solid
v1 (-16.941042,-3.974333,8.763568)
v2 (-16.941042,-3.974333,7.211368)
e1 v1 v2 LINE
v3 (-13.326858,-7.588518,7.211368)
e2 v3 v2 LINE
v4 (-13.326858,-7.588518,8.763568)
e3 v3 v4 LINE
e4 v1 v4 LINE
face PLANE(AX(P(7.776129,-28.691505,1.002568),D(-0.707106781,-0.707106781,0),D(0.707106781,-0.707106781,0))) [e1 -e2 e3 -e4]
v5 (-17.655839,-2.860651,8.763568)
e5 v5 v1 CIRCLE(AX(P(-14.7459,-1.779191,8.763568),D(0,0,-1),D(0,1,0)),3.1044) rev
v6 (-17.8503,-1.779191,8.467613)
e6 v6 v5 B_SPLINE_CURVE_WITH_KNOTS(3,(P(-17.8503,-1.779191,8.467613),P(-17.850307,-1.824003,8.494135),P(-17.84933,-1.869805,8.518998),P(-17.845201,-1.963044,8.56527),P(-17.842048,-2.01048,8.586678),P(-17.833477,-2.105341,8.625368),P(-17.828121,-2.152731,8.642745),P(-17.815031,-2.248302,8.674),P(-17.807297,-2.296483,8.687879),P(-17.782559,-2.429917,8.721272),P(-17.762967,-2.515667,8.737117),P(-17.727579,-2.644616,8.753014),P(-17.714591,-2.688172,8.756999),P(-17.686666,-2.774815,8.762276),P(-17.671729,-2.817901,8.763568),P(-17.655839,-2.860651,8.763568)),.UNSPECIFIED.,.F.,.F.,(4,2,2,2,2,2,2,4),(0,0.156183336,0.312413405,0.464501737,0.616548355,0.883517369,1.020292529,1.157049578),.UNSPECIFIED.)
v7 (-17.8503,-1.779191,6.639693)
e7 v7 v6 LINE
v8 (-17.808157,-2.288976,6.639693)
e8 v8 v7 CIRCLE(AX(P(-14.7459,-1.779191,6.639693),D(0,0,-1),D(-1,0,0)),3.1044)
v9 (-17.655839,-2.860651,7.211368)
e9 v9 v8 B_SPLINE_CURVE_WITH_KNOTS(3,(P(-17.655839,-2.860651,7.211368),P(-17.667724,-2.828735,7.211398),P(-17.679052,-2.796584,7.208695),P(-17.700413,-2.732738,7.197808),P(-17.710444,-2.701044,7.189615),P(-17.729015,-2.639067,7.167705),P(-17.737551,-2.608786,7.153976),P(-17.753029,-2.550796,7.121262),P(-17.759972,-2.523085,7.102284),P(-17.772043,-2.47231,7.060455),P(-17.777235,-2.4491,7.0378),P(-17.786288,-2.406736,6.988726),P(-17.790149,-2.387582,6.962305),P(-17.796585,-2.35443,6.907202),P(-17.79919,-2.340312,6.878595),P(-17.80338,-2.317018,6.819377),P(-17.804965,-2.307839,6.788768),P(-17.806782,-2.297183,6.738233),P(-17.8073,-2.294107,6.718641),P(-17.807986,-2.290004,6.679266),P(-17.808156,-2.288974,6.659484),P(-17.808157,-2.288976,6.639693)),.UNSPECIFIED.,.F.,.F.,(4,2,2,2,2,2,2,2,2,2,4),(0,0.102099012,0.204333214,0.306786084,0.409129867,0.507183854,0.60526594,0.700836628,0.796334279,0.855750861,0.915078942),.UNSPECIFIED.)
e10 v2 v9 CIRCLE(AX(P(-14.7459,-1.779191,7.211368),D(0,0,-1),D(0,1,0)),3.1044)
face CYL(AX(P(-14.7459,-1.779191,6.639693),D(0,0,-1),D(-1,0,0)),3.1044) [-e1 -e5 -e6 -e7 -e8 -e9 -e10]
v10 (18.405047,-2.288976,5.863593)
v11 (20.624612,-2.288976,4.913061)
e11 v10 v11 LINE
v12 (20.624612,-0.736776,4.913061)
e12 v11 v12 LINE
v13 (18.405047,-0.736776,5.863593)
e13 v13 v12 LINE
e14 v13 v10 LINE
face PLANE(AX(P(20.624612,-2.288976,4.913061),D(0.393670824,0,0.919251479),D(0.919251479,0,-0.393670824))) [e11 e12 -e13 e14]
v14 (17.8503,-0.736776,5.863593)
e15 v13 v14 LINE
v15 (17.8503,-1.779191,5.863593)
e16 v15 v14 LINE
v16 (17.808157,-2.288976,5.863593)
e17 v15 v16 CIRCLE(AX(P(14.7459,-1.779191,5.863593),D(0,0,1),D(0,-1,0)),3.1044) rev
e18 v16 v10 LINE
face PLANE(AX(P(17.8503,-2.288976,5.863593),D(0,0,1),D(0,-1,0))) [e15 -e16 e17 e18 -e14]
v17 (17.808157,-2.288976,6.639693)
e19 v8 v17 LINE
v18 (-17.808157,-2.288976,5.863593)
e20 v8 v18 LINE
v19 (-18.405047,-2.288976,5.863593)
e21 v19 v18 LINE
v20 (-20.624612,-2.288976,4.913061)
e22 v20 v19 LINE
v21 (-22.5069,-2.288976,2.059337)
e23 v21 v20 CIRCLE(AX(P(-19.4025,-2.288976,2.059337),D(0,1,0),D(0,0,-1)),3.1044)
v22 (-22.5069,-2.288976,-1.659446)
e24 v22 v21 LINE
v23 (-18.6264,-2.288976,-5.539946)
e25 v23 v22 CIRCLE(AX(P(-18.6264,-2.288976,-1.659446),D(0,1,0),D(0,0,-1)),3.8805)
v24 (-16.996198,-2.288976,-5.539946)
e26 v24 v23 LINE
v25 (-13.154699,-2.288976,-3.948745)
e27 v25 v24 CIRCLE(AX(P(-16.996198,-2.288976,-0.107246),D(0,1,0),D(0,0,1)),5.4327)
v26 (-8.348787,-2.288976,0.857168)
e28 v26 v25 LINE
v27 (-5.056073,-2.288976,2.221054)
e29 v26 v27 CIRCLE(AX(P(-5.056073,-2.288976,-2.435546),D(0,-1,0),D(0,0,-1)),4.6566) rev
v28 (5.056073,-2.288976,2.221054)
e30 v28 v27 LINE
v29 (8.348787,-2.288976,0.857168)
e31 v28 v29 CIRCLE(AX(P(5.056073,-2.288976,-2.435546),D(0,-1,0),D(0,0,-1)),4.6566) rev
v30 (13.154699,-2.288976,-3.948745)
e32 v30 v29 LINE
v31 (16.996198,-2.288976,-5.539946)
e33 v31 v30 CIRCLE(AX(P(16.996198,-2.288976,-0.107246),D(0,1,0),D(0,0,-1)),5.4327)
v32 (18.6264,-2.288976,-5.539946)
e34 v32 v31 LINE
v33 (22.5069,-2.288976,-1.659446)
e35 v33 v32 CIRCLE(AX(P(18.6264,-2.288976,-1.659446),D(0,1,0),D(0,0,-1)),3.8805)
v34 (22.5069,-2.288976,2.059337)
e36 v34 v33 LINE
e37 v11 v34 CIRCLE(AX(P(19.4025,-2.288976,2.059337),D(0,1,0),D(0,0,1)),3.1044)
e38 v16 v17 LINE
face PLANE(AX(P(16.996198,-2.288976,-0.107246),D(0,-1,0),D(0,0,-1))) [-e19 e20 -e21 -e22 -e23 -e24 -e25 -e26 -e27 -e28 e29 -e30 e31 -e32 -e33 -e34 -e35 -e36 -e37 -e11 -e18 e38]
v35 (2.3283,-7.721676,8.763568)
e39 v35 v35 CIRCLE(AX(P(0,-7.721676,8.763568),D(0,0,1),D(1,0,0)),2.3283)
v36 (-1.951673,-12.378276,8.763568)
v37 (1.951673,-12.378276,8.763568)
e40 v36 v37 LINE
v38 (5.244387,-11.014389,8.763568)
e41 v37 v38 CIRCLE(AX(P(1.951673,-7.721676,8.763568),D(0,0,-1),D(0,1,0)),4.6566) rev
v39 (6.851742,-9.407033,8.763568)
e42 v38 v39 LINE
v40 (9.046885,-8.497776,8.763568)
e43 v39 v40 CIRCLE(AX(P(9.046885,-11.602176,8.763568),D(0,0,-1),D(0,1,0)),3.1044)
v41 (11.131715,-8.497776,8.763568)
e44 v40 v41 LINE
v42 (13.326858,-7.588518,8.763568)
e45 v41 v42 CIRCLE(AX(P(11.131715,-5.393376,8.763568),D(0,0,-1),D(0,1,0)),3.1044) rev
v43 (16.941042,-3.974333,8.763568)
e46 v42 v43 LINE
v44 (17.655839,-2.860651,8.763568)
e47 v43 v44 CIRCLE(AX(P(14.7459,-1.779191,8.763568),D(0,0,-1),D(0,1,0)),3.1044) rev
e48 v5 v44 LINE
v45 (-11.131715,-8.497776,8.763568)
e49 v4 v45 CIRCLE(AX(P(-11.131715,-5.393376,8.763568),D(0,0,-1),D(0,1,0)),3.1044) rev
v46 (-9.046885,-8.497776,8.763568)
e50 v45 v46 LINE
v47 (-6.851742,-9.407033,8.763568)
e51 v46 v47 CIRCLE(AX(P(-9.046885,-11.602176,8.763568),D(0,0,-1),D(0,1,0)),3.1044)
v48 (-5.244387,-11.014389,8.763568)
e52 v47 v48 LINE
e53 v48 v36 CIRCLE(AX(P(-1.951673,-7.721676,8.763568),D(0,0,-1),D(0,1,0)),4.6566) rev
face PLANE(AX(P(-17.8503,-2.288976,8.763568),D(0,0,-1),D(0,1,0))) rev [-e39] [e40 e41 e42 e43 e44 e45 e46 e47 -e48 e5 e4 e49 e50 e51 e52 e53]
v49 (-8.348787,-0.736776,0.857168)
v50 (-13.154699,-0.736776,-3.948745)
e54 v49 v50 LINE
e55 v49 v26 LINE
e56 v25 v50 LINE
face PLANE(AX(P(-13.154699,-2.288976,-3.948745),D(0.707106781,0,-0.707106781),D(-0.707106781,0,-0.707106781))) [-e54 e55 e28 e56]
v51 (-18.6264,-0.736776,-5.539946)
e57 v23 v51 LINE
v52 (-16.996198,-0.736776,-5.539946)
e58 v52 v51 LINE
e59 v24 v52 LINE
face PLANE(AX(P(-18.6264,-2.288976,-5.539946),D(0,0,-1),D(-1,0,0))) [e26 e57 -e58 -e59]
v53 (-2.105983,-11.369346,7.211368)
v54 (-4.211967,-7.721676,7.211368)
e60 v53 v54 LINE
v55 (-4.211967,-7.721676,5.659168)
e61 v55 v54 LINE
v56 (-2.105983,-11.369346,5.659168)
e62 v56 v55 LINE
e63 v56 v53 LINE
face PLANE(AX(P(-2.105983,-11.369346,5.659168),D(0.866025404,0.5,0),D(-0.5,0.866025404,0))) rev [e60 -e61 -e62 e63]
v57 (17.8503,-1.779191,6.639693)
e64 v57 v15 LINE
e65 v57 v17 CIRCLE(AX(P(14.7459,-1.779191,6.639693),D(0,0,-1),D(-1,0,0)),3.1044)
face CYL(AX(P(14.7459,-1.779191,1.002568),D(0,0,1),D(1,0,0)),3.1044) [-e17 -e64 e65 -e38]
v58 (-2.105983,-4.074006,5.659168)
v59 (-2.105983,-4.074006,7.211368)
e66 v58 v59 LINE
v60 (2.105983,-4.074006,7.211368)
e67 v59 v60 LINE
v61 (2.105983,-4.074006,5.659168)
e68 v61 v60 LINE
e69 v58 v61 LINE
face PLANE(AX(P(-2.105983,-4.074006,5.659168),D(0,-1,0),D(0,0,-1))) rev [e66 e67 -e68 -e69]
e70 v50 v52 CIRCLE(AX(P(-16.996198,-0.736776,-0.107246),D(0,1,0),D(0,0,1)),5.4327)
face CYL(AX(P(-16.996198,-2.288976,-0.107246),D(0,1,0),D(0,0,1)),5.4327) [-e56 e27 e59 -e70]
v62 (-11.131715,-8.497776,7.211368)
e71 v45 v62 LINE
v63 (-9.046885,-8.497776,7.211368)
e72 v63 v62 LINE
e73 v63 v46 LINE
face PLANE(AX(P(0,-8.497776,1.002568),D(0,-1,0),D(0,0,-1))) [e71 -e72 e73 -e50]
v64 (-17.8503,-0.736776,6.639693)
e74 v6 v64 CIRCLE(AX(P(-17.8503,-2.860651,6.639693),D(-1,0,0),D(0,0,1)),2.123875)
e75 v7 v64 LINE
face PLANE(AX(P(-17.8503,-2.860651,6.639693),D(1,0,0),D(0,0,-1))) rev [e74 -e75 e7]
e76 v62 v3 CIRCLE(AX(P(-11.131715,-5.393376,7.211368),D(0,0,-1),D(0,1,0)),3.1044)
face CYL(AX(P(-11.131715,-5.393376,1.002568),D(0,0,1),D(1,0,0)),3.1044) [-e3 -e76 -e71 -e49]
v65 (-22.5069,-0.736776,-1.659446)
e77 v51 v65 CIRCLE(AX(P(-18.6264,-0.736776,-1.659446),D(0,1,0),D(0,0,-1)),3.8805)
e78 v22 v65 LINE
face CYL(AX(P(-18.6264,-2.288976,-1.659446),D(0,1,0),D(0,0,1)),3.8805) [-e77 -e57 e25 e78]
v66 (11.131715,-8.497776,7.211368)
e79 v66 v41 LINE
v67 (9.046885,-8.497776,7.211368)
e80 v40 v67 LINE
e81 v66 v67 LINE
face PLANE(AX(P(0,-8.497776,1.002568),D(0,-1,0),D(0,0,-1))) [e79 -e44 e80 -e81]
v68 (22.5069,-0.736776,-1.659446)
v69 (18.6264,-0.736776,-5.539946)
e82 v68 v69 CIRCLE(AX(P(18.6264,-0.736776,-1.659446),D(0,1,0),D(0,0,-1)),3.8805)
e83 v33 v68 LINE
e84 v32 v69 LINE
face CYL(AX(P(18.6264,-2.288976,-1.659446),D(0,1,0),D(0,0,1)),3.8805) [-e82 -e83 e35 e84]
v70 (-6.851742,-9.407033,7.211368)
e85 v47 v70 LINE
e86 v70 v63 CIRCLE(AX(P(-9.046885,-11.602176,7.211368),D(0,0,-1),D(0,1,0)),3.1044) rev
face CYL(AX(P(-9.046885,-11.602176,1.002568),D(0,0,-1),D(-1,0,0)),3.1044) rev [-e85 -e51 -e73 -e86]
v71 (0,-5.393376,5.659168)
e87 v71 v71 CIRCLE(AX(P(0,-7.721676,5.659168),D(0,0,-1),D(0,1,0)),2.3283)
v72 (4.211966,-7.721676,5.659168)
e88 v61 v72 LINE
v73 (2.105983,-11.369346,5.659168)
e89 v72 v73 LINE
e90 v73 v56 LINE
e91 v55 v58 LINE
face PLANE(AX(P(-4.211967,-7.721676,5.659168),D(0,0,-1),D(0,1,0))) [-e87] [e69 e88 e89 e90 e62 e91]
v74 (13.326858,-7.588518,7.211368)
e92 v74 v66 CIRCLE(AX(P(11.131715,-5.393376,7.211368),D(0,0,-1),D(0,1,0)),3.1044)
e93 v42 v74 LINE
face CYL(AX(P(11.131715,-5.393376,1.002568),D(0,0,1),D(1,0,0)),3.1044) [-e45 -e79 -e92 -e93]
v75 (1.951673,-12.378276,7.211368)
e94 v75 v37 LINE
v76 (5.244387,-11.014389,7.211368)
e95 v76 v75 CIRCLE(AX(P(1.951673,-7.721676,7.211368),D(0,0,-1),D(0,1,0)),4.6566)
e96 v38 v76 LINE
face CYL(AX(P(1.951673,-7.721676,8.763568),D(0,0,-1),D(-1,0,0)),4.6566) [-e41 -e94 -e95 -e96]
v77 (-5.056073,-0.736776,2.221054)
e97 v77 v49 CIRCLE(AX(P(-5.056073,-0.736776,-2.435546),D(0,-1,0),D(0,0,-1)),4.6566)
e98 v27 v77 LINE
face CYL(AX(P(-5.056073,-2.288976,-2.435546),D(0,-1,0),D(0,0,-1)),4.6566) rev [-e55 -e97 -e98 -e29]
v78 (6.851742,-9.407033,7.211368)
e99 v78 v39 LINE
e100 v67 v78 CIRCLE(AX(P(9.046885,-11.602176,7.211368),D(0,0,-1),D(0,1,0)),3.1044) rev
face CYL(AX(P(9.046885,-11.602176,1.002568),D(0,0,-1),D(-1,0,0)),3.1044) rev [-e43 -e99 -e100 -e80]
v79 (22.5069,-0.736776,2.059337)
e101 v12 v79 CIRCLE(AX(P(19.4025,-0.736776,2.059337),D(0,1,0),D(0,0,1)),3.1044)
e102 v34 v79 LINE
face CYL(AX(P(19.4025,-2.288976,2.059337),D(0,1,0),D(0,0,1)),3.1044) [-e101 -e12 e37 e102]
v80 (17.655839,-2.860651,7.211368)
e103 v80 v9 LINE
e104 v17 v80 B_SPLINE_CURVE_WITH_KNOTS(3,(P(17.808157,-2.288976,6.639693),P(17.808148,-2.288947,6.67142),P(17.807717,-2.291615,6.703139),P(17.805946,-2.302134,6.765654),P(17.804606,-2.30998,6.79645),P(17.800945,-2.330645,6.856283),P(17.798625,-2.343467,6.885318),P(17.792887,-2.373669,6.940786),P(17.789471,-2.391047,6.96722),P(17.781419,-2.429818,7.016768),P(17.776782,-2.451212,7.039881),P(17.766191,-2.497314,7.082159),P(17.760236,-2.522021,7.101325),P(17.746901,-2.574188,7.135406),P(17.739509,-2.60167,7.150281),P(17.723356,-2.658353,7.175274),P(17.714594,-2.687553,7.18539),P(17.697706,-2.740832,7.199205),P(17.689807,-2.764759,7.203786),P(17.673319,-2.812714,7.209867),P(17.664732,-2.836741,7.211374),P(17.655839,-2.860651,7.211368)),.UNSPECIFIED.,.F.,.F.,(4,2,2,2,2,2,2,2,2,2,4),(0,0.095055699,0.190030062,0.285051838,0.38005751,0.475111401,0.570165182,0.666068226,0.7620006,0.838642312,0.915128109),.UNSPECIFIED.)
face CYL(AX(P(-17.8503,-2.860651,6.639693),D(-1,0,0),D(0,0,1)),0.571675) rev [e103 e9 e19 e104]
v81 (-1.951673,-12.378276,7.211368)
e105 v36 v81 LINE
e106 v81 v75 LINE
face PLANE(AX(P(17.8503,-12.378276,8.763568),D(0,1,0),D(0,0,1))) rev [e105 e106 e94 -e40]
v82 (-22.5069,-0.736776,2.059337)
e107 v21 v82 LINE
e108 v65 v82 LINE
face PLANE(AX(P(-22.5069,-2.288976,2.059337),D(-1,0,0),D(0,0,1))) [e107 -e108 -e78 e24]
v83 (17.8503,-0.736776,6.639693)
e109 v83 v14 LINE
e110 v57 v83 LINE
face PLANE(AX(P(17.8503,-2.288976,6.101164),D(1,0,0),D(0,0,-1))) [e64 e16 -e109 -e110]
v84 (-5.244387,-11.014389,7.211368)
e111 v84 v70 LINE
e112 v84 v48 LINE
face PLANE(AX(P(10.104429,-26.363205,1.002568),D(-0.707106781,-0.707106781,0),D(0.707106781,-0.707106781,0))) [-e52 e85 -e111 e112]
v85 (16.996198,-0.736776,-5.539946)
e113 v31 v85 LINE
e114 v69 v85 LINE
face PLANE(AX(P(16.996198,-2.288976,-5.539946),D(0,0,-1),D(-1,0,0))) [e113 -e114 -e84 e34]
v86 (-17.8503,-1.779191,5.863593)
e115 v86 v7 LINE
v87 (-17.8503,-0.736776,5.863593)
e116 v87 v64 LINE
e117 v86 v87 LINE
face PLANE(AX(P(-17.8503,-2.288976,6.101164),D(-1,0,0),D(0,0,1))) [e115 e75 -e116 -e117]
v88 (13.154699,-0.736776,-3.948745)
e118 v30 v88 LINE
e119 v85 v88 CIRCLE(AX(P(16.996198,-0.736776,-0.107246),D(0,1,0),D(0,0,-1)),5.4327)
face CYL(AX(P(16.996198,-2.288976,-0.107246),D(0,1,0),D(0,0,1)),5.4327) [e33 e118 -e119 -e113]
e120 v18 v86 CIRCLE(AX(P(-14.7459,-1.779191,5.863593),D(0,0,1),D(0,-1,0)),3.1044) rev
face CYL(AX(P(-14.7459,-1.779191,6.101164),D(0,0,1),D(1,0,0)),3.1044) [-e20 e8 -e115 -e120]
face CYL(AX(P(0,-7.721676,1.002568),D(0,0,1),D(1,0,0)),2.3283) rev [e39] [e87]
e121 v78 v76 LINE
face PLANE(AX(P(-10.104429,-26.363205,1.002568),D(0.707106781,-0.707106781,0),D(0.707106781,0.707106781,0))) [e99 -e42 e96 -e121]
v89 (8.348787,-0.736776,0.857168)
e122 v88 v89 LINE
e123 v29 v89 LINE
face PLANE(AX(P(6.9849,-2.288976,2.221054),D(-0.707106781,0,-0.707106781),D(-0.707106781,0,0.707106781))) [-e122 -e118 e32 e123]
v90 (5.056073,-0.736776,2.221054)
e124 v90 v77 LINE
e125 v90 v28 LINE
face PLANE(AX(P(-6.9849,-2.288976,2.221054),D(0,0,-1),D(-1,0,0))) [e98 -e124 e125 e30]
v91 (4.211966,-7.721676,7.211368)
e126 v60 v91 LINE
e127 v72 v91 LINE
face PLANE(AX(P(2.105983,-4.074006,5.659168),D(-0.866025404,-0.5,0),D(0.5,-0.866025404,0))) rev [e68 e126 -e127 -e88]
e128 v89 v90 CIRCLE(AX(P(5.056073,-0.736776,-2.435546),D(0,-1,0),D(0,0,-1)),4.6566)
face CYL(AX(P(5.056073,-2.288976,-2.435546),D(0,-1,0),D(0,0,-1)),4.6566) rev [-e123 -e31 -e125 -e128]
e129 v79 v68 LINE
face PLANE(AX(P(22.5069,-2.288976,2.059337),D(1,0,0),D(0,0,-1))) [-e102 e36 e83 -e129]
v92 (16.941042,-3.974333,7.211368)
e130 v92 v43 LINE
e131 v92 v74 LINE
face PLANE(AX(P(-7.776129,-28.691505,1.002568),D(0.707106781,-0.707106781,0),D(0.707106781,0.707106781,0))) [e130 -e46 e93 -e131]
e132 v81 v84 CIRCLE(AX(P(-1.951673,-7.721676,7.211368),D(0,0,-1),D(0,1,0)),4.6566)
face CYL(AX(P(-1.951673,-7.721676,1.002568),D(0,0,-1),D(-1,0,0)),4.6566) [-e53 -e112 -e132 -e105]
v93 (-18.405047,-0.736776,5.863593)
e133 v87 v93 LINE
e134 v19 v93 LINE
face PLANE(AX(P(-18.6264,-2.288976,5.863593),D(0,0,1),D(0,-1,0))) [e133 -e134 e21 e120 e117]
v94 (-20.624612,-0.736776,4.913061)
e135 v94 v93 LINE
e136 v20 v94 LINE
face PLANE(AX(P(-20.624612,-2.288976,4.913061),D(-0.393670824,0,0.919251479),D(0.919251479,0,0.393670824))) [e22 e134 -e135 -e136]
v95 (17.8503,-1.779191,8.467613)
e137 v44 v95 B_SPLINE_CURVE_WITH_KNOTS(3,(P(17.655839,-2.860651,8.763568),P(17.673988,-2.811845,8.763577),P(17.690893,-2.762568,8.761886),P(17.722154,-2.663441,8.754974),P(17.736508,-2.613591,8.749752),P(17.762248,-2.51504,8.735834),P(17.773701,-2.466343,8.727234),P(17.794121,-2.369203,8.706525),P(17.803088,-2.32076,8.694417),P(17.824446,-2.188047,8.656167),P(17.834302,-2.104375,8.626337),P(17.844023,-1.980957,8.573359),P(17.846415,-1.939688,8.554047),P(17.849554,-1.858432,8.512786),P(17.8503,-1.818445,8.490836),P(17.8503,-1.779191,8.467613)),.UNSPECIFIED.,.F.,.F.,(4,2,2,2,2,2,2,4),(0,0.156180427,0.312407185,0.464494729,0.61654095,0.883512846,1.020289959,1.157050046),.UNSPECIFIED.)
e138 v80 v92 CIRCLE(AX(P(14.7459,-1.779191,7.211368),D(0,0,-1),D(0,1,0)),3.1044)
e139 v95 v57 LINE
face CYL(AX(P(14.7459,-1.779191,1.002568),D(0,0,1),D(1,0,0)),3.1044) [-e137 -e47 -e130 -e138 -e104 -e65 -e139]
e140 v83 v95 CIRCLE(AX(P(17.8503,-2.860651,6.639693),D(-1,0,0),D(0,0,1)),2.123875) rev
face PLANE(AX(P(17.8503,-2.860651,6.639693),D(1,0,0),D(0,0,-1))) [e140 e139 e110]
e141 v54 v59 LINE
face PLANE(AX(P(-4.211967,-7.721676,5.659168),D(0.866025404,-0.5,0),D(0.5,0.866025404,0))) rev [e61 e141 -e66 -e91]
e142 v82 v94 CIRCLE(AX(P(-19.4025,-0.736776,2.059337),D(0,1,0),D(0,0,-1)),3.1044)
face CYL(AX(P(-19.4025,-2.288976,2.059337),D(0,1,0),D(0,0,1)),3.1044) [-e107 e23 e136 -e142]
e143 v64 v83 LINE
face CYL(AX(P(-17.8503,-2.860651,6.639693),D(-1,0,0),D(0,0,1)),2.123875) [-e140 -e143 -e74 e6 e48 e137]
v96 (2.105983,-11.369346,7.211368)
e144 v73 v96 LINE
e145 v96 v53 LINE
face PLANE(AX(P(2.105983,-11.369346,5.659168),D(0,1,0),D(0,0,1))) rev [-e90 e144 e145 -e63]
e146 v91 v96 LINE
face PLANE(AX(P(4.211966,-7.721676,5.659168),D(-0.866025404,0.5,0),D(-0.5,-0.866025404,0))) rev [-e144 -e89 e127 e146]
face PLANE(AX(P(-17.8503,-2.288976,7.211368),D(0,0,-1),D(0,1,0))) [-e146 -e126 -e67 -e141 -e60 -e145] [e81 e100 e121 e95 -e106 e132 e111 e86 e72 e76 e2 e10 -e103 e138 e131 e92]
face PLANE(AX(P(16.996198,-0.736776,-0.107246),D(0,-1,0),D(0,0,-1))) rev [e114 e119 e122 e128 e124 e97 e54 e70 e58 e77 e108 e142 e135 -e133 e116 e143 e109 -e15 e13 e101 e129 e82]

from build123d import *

# Parameters (mm, degrees)
BASE_FLANGE1_DEPTH   = 2
EDGE_FLANGE1_START   = -23
EDGE_FLANGE1_DEPTH   = 46
EDGE_FLANGE1_START_2 = -23.714787909
EDGE_FLANGE1_2_DEPTH = 0.714787909
EDGE_FLANGE1_START_3 = 23
EDGE_FLANGE1_3_DEPTH = 0.714787909
EDGE_FLANGE1_4_DEPTH = 46
CUT_EXTRUDE1_DEPTH   = 10
FILLET1_R            = 4
FILLET2_R            = 6
SKETCH9_R            = 3
CUT_EXTRUDE2_DEPTH   = 10
SKETCH10_R           = 3
BOSS_EXTRUDE1_DEPTH  = 2
SCALE1_SCALE         = 0.7761


# Read off the part's stored shape, not the designer's step: Edge-Flange1
# Sheet-metal steps are written as plain solids
with BuildPart() as part:
    # Sketch1 → Base-Flange1 (new body)
    with BuildSketch(Plane(origin=(0, 0, 0), x_dir=(1, 0, 0), z_dir=(0, 1, 0))):
        with BuildLine():
            Line((-16.949747468, 6.379735664), (-9, -1.570011804))
            Line((-9, -1.570011804), (9, -1.570011804))
            Line((9, -1.570011804), (16.949747468, 6.379735664))
            ThreePointArc((16.949747468, 6.379735664), (19.22071091, 7.897144924), (21.899494937, 8.429988196))
            Line((21.899494937, 8.429988196), (24, 8.429988196))
            ThreePointArc((24, 8.429988196), (27.535533906, 6.965522102), (29, 3.429988196))
            Line((29, 3.429988196), (29, -1.361639596))
            ThreePointArc((29, -1.361639596), (28.339066725, -3.564054954), (26.574683296, -5.038645514))
            Line((26.574683296, -5.038645514), (23, -6.569508994))
            Line((23, -6.569508994), (23, -10))
            Line((23, -10), (-23, -10))
            Line((-23, -10), (-23, -6.569508994))
            Line((-23, -6.569508994), (-26.574683296, -5.038645514))
            ThreePointArc((-26.574683296, -5.038645514), (-28.339066725, -3.564054954), (-29, -1.361639596))
            Line((-29, -1.361639596), (-29, 3.429988196))
            ThreePointArc((-29, 3.429988196), (-27.535533906, 6.965522102), (-24, 8.429988196))
            Line((-24, 8.429988196), (-21.899494937, 8.429988196))
            ThreePointArc((-21.899494937, 8.429988196), (-19.22071091, 7.897144924), (-16.949747468, 6.379735664))
        make_face()
    extrude(amount=-BASE_FLANGE1_DEPTH)

    # Edge-Flange1 outline → Edge-Flange1 (cut)
    with BuildSketch(Plane.YZ.offset(EDGE_FLANGE1_START)):
        with BuildLine():
            ThreePointArc((-2, 9.899002398), (-0.556604688, 8.917667209), (0, 7.2634))
            Line((0, 7.2634), (0, 10))
            Line((0, 10), (-2, 10))
            Line((-2, 10), (-2, 9.899002398))
        make_face()
    extrude(amount=EDGE_FLANGE1_DEPTH, mode=Mode.SUBTRACT)

    # Edge-Flange1 2 outline → Edge-Flange1 2 (cut)
    with BuildSketch(Plane.YZ.offset(EDGE_FLANGE1_START_2)):
        with BuildLine():
            Line((-2, 6.2634), (0, 6.2634))
            Line((0, 6.2634), (0, 7.2634))
            ThreePointArc((0, 7.2634), (-0.556604688, 8.917667209), (-2, 9.899002398))
            Line((-2, 9.899002398), (-2, 6.2634))
        make_face()
    extrude(amount=EDGE_FLANGE1_2_DEPTH, mode=Mode.SUBTRACT)

    # Edge-Flange1 3 outline → Edge-Flange1 3 (cut)
    with BuildSketch(Plane.YZ.offset(EDGE_FLANGE1_START_3)):
        with BuildLine():
            Line((-2, 6.2634), (0, 6.2634))
            Line((0, 6.2634), (0, 7.2634))
            ThreePointArc((0, 7.2634), (-0.556604688, 8.917667209), (-2, 9.899002398))
            Line((-2, 9.899002398), (-2, 6.2634))
        make_face()
    extrude(amount=EDGE_FLANGE1_3_DEPTH, mode=Mode.SUBTRACT)

    # Edge-Flange1 4 outline → Edge-Flange1 4 (add)
    with BuildSketch(Plane.YZ.offset(EDGE_FLANGE1_START)):
        with BuildLine():
            ThreePointArc((-2.7366, 8), (-2.215745145, 7.784254855), (-2, 7.2634))
            Line((-2, 7.2634), (-2, 9.899002398))
            ThreePointArc((-2, 9.899002398), (-2.364854094, 9.974633029), (-2.7366, 10))
            Line((-2.7366, 10), (-15, 10))
            Line((-15, 10), (-15, 8))
            Line((-15, 8), (-2.7366, 8))
        make_face()
    extrude(amount=EDGE_FLANGE1_4_DEPTH)

    # Sketch8 → Cut-Extrude1 (cut)
    with BuildSketch(Plane.XY.offset(10)):
        Polygon((-16, -10), (-23, -3), (-23, -15), (-5, -15), (-10, -10), align=None)
        Polygon((10, -10), (5, -15), (23, -15), (23, -3), (16, -10), align=None)
    extrude(amount=-CUT_EXTRUDE1_DEPTH, mode=Mode.SUBTRACT)

    # Fillet1
    fillet1_edges = [part.edges().sort_by_distance(p)[0] for p in [
        (-23, -3, 9),
        (-16, -10, 9),
        (-10, -10, 9),
        (10, -10, 9),
        (16, -10, 9),
        (23, -3, 9),
    ]]
    fillet(fillet1_edges, radius=FILLET1_R)

    # Fillet2
    fillet2_edges = [part.edges().sort_by_distance(p)[0] for p in [
        (-5, -15, 9),
        (5, -15, 9),
        (9, -1, 1.570011804),
        (-9, -1, 1.570011804),
    ]]
    fillet(fillet2_edges, radius=FILLET2_R)

    # Sketch9 → Cut-Extrude2 (cut)
    with BuildSketch(Plane.XY.offset(10)):
        with Locations((0, -9)):
            Circle(SKETCH9_R)
    extrude(amount=-CUT_EXTRUDE2_DEPTH, mode=Mode.SUBTRACT)

    # Sketch10 → Boss-Extrude1 (add)
    with BuildSketch(Plane(origin=(0, 0, 8), x_dir=(-1, 0, 0), z_dir=(0, 0, -1))):
        Polygon((5.42709253, -9), (2.713546265, -4.3), (-2.713546265, -4.3), (-5.42709253, -9), (-2.713546265, -13.7), (2.713546265, -13.7), align=None)
        with Locations(Location((0, -9, 0), (0, 0, 180))):
            Circle(SKETCH10_R, mode=Mode.SUBTRACT)
    extrude(amount=BOSS_EXTRUDE1_DEPTH)


with BuildPart() as part_1:
    # Scale1: scaled about (0, -3.290648573, 4.477741927)
    add(part.part.scale(SCALE1_SCALE).moved(Location((0, -0.736776215, 1.002566417))))


solid = part_1.part
